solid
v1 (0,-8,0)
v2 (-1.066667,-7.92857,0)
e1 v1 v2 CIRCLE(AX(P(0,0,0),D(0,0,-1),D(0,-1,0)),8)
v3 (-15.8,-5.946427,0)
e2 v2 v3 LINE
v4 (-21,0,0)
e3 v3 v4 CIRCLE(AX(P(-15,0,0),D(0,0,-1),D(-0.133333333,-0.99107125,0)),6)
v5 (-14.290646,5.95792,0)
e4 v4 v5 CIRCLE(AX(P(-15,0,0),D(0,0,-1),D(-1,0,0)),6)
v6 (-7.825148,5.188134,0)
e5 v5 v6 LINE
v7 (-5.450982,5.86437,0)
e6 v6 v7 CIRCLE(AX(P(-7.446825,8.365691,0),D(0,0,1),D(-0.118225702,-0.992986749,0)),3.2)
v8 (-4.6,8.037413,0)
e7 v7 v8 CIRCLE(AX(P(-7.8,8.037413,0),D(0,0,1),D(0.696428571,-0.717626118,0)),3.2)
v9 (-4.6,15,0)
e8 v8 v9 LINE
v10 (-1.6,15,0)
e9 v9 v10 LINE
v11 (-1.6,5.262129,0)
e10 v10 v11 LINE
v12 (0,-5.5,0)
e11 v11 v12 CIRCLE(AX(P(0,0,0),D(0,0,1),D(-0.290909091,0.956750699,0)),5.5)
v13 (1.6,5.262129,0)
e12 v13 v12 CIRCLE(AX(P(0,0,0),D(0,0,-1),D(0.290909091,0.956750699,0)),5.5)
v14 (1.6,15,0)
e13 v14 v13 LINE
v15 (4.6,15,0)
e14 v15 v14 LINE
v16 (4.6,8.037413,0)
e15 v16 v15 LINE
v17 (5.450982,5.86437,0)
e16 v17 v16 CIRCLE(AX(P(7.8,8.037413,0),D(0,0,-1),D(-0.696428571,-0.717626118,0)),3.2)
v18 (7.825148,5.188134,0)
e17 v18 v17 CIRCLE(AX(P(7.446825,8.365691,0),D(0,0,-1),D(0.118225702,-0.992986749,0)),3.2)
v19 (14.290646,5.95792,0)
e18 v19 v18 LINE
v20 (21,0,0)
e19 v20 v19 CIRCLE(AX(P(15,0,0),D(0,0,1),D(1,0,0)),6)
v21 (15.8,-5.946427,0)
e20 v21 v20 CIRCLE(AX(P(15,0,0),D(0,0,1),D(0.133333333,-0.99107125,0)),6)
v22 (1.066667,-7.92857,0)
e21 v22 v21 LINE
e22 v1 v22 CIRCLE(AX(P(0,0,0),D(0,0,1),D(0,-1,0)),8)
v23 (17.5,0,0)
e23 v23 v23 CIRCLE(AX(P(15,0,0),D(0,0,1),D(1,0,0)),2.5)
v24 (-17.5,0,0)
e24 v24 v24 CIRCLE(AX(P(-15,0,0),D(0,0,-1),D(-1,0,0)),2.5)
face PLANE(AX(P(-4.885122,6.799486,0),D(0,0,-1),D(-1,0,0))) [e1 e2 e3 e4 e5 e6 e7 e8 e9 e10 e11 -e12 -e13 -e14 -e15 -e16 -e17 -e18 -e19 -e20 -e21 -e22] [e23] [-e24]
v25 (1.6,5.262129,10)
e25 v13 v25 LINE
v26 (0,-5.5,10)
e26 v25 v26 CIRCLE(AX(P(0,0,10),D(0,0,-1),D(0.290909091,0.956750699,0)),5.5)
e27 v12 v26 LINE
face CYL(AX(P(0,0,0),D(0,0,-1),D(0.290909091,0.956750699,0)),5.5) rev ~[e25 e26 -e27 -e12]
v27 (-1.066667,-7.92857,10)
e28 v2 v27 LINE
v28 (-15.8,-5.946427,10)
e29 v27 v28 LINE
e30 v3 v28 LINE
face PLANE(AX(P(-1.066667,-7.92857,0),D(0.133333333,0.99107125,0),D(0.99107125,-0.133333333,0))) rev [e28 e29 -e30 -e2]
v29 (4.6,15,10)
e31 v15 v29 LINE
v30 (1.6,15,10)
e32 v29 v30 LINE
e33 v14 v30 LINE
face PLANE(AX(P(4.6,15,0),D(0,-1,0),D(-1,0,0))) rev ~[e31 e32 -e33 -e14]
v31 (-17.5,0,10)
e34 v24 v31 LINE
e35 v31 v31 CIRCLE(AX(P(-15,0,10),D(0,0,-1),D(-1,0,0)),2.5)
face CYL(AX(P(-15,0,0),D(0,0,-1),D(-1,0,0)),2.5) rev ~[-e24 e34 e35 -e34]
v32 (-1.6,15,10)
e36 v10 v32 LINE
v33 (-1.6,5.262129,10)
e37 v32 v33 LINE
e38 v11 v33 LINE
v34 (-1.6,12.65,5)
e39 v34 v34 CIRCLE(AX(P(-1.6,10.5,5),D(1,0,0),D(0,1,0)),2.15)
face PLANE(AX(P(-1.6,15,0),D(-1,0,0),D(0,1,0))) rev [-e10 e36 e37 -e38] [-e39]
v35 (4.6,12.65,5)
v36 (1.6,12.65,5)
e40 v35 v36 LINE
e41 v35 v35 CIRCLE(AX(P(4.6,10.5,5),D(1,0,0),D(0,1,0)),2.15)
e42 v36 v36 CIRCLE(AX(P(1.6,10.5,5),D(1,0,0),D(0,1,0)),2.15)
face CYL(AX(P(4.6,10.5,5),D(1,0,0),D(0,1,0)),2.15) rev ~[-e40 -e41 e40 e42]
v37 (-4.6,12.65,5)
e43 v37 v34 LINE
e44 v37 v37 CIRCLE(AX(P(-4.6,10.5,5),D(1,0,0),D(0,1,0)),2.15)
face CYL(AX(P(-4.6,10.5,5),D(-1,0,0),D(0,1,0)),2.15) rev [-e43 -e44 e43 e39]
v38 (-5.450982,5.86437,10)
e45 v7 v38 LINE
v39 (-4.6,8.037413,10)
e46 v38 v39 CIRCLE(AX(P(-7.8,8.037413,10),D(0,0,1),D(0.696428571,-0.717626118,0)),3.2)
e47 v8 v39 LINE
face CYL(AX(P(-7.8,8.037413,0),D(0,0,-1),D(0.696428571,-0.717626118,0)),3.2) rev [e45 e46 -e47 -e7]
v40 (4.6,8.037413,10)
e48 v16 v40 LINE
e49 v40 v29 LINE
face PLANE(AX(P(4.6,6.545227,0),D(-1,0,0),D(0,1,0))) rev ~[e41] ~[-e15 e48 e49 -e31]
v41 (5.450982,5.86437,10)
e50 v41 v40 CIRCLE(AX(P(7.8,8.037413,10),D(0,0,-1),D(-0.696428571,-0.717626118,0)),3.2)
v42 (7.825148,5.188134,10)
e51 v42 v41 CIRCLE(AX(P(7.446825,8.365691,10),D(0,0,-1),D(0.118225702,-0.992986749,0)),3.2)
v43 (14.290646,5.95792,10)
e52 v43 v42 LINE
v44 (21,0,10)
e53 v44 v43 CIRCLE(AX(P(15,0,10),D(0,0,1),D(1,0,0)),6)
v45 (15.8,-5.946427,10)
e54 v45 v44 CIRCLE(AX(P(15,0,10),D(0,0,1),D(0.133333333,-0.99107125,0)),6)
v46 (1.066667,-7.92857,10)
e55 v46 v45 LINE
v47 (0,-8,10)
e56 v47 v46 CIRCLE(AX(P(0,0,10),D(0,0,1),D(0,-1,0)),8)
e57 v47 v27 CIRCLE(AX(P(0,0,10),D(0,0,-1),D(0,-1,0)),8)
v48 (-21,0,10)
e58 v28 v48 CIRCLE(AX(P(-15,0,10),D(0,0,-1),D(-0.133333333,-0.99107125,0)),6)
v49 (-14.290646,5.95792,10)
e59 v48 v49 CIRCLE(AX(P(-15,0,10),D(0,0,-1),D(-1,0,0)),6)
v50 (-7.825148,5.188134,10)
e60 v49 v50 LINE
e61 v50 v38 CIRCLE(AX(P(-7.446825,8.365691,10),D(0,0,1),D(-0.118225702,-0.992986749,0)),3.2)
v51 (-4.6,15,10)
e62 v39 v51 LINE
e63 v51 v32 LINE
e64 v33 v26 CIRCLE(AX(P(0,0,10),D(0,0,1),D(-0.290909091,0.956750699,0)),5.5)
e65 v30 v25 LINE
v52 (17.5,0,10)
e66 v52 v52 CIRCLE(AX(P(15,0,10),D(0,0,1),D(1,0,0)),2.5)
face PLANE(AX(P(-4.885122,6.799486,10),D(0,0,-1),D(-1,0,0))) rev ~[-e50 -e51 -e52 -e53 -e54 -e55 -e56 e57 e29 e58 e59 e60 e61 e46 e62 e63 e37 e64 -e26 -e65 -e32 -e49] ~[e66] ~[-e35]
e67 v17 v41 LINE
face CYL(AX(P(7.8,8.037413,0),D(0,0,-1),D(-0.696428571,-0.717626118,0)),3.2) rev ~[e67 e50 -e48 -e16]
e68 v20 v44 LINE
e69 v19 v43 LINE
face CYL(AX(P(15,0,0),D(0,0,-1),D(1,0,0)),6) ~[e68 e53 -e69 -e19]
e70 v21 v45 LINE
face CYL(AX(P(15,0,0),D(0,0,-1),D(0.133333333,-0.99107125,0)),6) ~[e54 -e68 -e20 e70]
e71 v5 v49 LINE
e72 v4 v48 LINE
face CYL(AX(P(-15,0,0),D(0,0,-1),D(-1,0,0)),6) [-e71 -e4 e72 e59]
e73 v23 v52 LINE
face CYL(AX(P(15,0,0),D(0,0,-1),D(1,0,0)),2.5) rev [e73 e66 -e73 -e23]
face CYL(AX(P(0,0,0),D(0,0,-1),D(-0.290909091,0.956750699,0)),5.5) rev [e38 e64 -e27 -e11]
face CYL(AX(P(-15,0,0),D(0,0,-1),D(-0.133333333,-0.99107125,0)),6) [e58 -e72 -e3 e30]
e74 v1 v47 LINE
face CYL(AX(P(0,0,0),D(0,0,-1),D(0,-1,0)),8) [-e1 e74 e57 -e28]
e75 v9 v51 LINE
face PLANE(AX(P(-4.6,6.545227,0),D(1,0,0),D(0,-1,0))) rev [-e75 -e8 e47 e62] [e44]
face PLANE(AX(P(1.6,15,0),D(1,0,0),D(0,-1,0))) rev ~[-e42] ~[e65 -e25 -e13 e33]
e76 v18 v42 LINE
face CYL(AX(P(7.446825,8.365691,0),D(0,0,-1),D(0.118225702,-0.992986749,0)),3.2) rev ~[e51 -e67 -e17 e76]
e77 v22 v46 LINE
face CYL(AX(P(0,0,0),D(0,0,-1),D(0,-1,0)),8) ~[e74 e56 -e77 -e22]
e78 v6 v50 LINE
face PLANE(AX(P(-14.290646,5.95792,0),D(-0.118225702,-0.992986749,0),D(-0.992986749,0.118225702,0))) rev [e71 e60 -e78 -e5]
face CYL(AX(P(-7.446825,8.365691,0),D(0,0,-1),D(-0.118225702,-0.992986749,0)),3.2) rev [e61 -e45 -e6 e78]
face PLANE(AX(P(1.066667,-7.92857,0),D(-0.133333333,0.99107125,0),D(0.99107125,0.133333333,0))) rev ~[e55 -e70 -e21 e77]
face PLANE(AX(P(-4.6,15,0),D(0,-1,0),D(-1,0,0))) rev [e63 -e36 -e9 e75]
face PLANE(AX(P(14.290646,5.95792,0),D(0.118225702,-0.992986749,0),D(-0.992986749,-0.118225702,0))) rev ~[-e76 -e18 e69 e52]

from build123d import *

# Parameters (mm, degrees)
F0_R        = 2.5
F1_DEPTH    = 10
F2_R        = 2.15
F3_DEPTH    = 25
F5_T1_DEPTH = 10


# Not quite as in the source:
# - a fillet or chamfer that OpenCascade refuses, or shapes differently, is made with other operations: its cross-section is extruded or revolved along the edge and cut away or added


with BuildPart() as f1:
    # F0 (on Top) → F1 (new body)
    with BuildSketch(Plane.XY):
        with BuildLine():
            ThreePointArc((1.6, 5.2621288468), (5.4402071954, -0.8087927246), (0, -5.5))
            Line((0, -5.5), (0, -8))
            ThreePointArc((0, -8), (0.5345278854, -7.982122521), (1.0666667681, -7.9285699849))
            ThreePointArc((1.0666667681, -7.9285699849), (7.426445373, -2.9745435149), (6.2449979984, 5))
            ThreePointArc((6.2449979984, 5), (5.477264575, 5.8309152605), (4.6, 6.5452272688))
            ThreePointArc((4.6, 6.5452272688), (3.166710076, 7.3465602355), (1.6, 7.8383671769))
            Line((1.6, 7.8383671769), (1.6, 5.2621288468))
        make_face()
        with BuildLine():
            ThreePointArc((6.2449979984, 5), (7.426445373, -2.9745435149), (1.0666667681, -7.9285699849))
            Line((1.0666667681, -7.9285699849), (15.8, -5.9464274989))
            ThreePointArc((15.8, -5.9464274989), (9.0476534506, -0.7546989834), (14.2906457894, 5.9579204932))
            Line((14.2906457894, 5.9579204932), (6.2449979984, 5))
        make_face()
        with BuildLine():
            Line((1.6, 15), (1.6, 7.8383671769))
            ThreePointArc((1.6, 7.8383671769), (3.166710076, 7.3465602355), (4.6, 6.5452272688))
            Line((4.6, 6.5452272688), (4.6, 15))
            Line((4.6, 15), (1.6, 15))
        make_face()
        with BuildLine():
            ThreePointArc((14.2906457894, 5.9579204932), (9.0476534506, -0.7546989834), (15.8, -5.9464274989))
            ThreePointArc((15.8, -5.9464274989), (19.5166359163, -3.9496835316), (21, 0))
            ThreePointArc((21, 0), (18.9839600109, 4.4864309458), (14.2906457894, 5.9579204932))
        make_face()
        with Locations((15, 0)):
            Circle(F0_R, mode=Mode.SUBTRACT)
    extrude(amount=F1_DEPTH)

    # F2 (on face) → F3 (cut)
    with BuildSketch(Plane.YZ.offset(4.6)):
        with Locations((10.5, 5)):
            Circle(F2_R)
    extrude(amount=-F3_DEPTH, mode=Mode.SUBTRACT)

    # F4: F1 across plane


with BuildPart() as f1_1:
    add(f1.part)
    add(f1.part.mirror(Plane.YZ))

    # F5: fillet of radius 3.2 on 4 edges, made by hand

    # F5_s2 → F5_t1 (join)
    with BuildSketch(Plane.XY):
        with BuildLine():
            ThreePointArc((-5.5714285714, 5.7410089421), (-4.8528464095, 6.790702563), (-4.6, 8.037412519))
            Line((-4.6, 8.037412519), (-4.6, 6.5452272688))
            ThreePointArc((-4.6, 6.5452272688), (-5.1015861823, 6.1622900309), (-5.5714285714, 5.7410089421))
        make_face()
        with BuildLine():
            ThreePointArc((-7.8251476511, 5.1881337307), (-6.4876416555, 5.3128293037), (-5.3191610039, 5.9754938051))
            ThreePointArc((-5.3191610039, 5.9754938051), (-5.8026149621, 5.5072370206), (-6.2449979984, 5))
            Line((-6.2449979984, 5), (-7.8251476511, 5.1881337307))
        make_face()
        with BuildLine():
            ThreePointArc((7.8251476511, 5.1881337307), (6.4876416555, 5.3128293037), (5.3191610039, 5.9754938051))
            ThreePointArc((5.3191610039, 5.9754938051), (5.8026149621, 5.5072370206), (6.2449979984, 5))
            Line((6.2449979984, 5), (7.8251476511, 5.1881337307))
        make_face()
        with BuildLine():
            ThreePointArc((5.5714285714, 5.7410089421), (4.8528464095, 6.790702563), (4.6, 8.037412519))
            Line((4.6, 8.037412519), (4.6, 6.5452272688))
            ThreePointArc((4.6, 6.5452272688), (5.1015861823, 6.1622900309), (5.5714285714, 5.7410089421))
        make_face()
    extrude(amount=F5_T1_DEPTH)


solid = f1_1.part
